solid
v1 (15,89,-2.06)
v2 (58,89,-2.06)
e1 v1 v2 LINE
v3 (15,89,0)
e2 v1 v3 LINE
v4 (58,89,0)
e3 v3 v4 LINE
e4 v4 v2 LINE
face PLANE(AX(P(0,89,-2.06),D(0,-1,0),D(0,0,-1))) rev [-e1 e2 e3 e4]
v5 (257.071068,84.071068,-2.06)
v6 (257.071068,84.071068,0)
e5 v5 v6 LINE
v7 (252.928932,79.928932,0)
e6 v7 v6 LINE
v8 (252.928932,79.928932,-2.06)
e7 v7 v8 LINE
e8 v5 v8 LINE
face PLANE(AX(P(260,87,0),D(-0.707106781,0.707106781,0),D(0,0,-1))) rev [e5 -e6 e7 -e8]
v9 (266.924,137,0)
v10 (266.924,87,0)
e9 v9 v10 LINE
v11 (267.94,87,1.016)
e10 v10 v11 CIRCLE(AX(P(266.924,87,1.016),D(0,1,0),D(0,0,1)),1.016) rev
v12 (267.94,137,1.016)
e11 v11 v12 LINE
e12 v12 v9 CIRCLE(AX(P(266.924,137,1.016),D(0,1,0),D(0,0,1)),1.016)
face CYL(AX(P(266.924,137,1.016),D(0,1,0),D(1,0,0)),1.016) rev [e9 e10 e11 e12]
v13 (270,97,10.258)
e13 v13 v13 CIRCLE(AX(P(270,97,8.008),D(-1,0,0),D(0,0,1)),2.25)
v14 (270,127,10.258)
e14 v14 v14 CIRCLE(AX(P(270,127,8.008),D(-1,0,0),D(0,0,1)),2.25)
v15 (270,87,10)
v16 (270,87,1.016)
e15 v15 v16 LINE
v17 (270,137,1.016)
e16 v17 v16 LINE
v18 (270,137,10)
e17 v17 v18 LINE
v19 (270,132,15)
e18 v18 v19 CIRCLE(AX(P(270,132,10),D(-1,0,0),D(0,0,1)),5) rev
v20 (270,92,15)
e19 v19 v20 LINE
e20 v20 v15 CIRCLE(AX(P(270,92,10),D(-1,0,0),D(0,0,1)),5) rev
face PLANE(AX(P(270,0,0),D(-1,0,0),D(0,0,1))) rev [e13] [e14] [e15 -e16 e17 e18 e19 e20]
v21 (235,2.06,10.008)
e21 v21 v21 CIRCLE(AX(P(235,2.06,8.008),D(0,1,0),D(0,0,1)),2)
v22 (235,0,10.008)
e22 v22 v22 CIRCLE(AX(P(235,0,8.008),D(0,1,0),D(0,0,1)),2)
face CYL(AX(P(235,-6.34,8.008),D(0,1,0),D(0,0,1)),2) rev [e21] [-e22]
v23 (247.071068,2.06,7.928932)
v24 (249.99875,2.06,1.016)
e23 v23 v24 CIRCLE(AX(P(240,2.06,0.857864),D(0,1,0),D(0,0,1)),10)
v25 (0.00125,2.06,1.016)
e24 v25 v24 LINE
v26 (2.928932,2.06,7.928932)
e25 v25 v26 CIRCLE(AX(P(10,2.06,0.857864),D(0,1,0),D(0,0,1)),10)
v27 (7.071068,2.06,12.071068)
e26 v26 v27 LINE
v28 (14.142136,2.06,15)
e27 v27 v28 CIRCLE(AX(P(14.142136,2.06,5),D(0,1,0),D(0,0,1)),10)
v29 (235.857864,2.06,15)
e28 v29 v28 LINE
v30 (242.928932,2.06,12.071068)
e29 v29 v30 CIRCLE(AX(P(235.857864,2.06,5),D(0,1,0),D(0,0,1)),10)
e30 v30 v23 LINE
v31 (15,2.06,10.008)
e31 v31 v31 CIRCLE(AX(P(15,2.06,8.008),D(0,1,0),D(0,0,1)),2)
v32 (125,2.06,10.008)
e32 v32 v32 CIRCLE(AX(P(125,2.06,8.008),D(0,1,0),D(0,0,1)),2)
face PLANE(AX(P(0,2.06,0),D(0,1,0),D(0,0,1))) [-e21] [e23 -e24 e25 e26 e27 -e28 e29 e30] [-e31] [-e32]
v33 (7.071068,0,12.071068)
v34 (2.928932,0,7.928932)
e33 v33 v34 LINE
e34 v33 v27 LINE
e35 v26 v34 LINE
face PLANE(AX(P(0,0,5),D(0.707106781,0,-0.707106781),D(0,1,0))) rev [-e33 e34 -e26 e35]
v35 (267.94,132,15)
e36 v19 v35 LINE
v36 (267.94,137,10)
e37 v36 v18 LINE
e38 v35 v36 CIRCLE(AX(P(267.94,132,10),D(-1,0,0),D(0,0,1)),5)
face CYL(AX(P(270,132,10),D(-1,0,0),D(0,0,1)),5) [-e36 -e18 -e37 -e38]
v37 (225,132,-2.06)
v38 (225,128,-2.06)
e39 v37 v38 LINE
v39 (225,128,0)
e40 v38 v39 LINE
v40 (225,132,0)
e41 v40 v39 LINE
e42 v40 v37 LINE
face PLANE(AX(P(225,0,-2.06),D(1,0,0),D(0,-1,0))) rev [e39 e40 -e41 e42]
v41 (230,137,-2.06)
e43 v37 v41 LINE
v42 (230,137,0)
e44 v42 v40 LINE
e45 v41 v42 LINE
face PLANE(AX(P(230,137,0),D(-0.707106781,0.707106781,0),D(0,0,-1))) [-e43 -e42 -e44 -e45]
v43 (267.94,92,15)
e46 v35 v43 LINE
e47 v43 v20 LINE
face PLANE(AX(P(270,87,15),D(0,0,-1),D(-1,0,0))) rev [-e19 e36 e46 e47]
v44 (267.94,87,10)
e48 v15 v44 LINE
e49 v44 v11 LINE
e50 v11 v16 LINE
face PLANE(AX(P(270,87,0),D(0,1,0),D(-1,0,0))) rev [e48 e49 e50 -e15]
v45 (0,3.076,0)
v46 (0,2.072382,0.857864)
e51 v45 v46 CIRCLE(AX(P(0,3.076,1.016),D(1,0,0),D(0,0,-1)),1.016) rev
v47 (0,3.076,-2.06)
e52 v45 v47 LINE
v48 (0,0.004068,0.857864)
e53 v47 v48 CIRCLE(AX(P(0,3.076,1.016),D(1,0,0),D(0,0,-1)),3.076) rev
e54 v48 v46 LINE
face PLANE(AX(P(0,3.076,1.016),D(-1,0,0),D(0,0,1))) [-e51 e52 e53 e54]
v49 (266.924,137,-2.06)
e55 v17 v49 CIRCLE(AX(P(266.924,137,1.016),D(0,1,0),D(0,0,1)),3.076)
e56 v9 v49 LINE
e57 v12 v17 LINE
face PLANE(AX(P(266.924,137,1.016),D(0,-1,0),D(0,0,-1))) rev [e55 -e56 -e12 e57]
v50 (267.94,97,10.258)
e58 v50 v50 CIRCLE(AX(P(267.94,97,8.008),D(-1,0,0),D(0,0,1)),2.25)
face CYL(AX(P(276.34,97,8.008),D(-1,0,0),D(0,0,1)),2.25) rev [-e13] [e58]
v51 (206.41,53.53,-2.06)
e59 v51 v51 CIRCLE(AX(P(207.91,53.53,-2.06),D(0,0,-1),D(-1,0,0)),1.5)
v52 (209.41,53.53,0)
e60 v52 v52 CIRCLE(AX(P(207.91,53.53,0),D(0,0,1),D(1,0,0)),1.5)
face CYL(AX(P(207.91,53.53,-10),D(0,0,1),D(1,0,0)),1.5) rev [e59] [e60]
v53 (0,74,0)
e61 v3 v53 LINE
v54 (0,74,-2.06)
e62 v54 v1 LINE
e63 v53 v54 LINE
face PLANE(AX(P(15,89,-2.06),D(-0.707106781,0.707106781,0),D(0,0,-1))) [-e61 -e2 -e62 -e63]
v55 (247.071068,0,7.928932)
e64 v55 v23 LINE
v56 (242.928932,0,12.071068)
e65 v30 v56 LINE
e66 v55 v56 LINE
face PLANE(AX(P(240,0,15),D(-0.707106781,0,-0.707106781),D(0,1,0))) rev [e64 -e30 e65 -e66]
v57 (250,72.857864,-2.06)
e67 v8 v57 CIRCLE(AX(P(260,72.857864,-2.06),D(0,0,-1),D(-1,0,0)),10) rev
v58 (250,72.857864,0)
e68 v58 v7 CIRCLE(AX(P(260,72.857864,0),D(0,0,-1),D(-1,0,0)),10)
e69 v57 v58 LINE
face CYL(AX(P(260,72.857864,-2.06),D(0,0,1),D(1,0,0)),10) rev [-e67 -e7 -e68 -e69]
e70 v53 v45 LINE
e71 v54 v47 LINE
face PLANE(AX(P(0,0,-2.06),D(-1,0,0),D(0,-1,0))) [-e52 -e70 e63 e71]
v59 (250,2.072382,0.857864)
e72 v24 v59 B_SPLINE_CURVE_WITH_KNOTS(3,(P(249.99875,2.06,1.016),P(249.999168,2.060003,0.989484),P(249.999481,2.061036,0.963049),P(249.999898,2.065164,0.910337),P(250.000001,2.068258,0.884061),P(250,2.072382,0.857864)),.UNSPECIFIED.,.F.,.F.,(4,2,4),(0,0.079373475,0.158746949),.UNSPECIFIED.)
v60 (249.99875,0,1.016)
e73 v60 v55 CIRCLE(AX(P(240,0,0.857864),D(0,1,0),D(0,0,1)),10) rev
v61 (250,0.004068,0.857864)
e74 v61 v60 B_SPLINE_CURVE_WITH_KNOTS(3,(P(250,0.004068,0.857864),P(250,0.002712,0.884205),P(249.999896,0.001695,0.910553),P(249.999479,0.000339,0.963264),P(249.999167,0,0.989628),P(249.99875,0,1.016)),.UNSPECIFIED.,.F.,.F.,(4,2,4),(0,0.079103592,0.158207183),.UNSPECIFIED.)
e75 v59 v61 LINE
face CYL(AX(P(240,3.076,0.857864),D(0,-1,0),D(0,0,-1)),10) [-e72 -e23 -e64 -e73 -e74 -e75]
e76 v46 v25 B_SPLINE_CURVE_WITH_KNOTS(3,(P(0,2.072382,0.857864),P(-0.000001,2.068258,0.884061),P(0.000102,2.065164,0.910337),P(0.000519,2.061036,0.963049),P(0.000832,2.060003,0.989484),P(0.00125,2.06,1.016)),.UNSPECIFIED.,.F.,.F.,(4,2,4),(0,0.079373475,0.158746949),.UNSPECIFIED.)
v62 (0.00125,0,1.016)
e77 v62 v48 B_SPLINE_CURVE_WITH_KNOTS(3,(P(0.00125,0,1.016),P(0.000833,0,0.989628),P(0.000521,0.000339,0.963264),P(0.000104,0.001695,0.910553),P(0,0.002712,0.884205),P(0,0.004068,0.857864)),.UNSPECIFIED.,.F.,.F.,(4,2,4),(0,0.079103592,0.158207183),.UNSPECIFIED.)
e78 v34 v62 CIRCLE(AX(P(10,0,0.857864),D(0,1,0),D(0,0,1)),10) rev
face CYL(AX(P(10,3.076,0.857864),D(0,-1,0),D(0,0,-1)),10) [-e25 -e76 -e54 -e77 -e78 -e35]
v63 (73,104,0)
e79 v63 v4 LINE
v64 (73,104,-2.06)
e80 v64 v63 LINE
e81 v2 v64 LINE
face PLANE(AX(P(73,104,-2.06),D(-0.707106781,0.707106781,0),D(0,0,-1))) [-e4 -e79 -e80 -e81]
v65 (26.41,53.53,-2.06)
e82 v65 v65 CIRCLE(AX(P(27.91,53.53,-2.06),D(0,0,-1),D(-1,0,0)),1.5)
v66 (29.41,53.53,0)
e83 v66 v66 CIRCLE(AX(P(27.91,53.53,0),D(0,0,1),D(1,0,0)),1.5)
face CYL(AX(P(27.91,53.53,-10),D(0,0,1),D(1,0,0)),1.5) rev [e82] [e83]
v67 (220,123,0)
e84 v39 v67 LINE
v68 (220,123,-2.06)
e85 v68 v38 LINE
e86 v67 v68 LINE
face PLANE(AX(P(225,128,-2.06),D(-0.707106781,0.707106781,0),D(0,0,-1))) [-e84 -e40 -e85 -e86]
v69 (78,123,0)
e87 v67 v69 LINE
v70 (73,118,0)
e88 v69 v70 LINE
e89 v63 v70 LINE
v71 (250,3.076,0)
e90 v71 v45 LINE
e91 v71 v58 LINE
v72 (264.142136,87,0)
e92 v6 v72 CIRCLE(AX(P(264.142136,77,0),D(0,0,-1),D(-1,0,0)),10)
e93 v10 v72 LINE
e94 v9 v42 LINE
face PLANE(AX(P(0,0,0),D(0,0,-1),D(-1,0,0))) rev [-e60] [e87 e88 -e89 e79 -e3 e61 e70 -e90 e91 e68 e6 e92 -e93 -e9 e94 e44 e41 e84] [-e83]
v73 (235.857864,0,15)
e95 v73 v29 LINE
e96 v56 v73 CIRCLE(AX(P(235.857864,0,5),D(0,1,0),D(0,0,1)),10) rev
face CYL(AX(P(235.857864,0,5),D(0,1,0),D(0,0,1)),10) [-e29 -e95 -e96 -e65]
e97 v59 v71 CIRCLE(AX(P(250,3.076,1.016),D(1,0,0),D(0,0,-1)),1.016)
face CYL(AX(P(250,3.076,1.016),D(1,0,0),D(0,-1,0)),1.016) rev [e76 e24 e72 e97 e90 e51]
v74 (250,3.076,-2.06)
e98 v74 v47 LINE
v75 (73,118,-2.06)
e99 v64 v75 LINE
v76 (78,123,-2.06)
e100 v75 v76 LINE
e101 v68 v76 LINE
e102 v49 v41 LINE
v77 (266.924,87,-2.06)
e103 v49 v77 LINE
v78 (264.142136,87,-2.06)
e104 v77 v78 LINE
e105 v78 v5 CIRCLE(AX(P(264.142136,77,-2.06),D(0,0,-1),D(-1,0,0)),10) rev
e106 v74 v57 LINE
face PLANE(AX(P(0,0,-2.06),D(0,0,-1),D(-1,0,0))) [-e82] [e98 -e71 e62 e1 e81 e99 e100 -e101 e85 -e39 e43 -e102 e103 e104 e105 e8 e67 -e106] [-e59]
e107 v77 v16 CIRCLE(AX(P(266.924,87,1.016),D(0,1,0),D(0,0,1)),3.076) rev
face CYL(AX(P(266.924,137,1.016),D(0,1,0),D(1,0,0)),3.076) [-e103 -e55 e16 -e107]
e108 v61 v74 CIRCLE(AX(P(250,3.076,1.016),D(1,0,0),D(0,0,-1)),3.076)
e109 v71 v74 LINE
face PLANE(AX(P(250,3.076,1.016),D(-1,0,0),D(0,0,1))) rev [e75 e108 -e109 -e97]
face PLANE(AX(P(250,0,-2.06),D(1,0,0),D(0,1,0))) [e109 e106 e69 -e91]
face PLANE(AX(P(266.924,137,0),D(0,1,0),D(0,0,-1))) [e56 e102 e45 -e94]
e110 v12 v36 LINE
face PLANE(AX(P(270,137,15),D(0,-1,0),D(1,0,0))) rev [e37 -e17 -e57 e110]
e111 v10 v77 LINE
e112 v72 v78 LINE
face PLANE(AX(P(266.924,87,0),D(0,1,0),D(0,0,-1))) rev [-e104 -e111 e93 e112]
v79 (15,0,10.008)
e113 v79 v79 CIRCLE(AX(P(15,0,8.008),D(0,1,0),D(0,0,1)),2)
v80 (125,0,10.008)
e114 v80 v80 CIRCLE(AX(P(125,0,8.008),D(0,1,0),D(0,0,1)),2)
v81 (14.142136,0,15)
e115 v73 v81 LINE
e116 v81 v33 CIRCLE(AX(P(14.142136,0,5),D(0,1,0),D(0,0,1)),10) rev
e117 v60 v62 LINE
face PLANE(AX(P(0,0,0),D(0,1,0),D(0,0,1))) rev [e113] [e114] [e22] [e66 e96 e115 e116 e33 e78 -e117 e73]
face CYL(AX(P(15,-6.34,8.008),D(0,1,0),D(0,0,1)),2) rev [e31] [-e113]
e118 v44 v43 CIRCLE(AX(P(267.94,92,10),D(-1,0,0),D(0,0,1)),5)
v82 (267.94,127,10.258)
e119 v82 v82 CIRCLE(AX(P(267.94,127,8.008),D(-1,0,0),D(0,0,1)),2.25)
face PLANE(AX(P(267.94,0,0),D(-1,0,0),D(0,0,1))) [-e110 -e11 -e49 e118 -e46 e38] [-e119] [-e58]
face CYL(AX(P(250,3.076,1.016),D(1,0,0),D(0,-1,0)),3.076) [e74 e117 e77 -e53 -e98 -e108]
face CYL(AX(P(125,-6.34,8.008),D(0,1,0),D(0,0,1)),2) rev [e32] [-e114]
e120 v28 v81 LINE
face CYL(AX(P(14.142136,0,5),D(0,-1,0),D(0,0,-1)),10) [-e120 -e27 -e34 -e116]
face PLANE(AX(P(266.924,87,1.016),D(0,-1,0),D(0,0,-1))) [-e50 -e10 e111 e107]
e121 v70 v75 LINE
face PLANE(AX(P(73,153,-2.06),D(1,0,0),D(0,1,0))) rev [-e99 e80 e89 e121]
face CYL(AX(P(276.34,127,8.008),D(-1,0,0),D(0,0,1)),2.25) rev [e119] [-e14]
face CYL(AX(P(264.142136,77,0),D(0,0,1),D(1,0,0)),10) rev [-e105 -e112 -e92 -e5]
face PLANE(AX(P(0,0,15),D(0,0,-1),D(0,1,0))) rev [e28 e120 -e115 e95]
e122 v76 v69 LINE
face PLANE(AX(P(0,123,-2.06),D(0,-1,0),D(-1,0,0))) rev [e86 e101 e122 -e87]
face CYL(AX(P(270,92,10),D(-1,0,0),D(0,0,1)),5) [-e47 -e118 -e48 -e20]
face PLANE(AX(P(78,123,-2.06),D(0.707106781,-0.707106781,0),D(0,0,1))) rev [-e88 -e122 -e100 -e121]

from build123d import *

# Parameters (mm, degrees)
SKETCH1_W                    = 250
SKETCH1_H                    = 153
BASE_FLANGE1_DEPTH           = 2.06
EDGE_FLANGE1_STRIP_W         = 10.272
EDGE_FLANGE1_STRIP_H         = 2.06
EDGE_FLANGE1_STRIP_CUT_DEPTH = 250
EDGE_FLANGE1_DEPTH           = 250
EDGE_FLANGE2_DEPTH           = 50
CHAMFER1_SIZE                = 10
SKETCH13_R                   = 2
CUT_EXTRUDE2_DEPTH           = 8.4
SKETCH14_R                   = 2.25
CUT_EXTRUDE3_DEPTH           = 8.4
SKETCH20_W                   = 73
SKETCH20_H                   = 64
CUT_EXTRUDE9_DEPTH           = 10
FILLET1_R                    = 10
CHAMFER3_SIZE                = 15
CHAMFER4_SIZE                = 15
SKETCH21_R                   = 1.5
CUT_EXTRUDE10_DEPTH          = 10
FILLET2_R                    = 5
CUT_EXTRUDE11_DEPTH          = 10
CHAMFER5_SIZE                = 5


# Sheet-metal steps are written as plain solids
with BuildPart() as part:
    # Sketch1 → Base-Flange1 (new body)
    with BuildSketch(Plane.XY):
        with Locations((125, 76.5)):
            Rectangle(SKETCH1_W, SKETCH1_H)
    extrude(amount=-BASE_FLANGE1_DEPTH)

    # Edge-Flange1 strip (across the edge) → Edge-Flange1 strip cut (cut)
    with BuildSketch(Plane.YZ):
        with Locations((-2.06, -1.03)):
            Rectangle(EDGE_FLANGE1_STRIP_W, EDGE_FLANGE1_STRIP_H)
    extrude(amount=EDGE_FLANGE1_STRIP_CUT_DEPTH, mode=Mode.SUBTRACT)

    # Edge-Flange1 section (across the edge) → Edge-Flange1 (add)
    with BuildSketch(Plane.YZ):
        with BuildLine():
            Line((0, 1.016), (0, 15))
            Line((0, 15), (2.06, 15))
            Line((2.06, 15), (2.06, 1.016))
            ThreePointArc((2.06, 1.016), (2.35757951, 0.29757951), (3.076, 0))
            Line((3.076, 0), (3.076, -2.06))
            ThreePointArc((3.076, -2.06), (0.900939541, -1.159060459), (0, 1.016))
        make_face()
    extrude(amount=EDGE_FLANGE1_DEPTH)

    # Edge-Flange2 section (across the edge) → Edge-Flange2 (add)
    with BuildSketch(Plane(origin=(270, 87, 0), x_dir=(-1, 0, 0), z_dir=(0, 1, 0))):
        with BuildLine():
            Line((0, 1.016), (0, 15))
            Line((0, 15), (2.06, 15))
            Line((2.06, 15), (2.06, 1.016))
            ThreePointArc((2.06, 1.016), (2.35757951, 0.29757951), (3.076, 0))
            Line((3.076, 0), (20, 0))
            Line((20, 0), (20, -2.06))
            Line((20, -2.06), (3.076, -2.06))
            ThreePointArc((3.076, -2.06), (0.900939541, -1.159060459), (0, 1.016))
        make_face()
    extrude(amount=EDGE_FLANGE2_DEPTH)

    # Chamfer1
    chamfer1_edges = [part.edges().sort_by_distance(p)[0] for p in [
        (0, 1.03, 15),
        (250, 1.03, 15),
        (250, 87, -1.03),
        (250, 153, -1.03),
    ]]
    chamfer(chamfer1_edges, length=CHAMFER1_SIZE)

    # Sketch13 → Cut-Extrude2 (cut)
    with BuildSketch(Plane(origin=(0, 2.06, 0), x_dir=(1, 0, 0), z_dir=(0, 1, 0))):
        with Locations(Location((125, -8.008, 0), (0, 0, 270))):
            Circle(SKETCH13_R)
        with Locations(Location((235, -8.008, 0), (0, 0, 270))):
            Circle(SKETCH13_R)
        with Locations(Location((15, -8.008, 0), (0, 0, 270))):
            Circle(SKETCH13_R)
    extrude(amount=-CUT_EXTRUDE2_DEPTH, mode=Mode.SUBTRACT)

    # Sketch14 → Cut-Extrude3 (cut)
    with BuildSketch(Plane.ZY.offset(-267.94)):
        with Locations((8.008, 127)):
            Circle(SKETCH14_R)
        with Locations((8.008, 97)):
            Circle(SKETCH14_R)
    extrude(amount=-CUT_EXTRUDE3_DEPTH, mode=Mode.SUBTRACT)

    # Sketch20 → Cut-Extrude9 (cut)
    with BuildSketch(Plane.XY):
        with Locations((36.5, 121)):
            Rectangle(SKETCH20_W, SKETCH20_H)
    extrude(amount=-CUT_EXTRUDE9_DEPTH, mode=Mode.SUBTRACT)

    # Fillet1
    fillet1_edges = [part.edges().sort_by_distance(p)[0] for p in [
        (250, 1.03, 5),
        (240, 1.03, 15),
        (10, 1.03, 15),
        (0, 1.03, 5),
        (250, 77, -1.03),
        (260, 87, -1.03),
    ]]
    fillet(fillet1_edges, radius=FILLET1_R)

    # Chamfer3
    chamfer3_edges = [part.edges().sort_by_distance(p)[0] for p in [
        (0, 89, -1.03),
    ]]
    chamfer(chamfer3_edges, length=CHAMFER3_SIZE)

    # Chamfer4
    chamfer4_edges = [part.edges().sort_by_distance(p)[0] for p in [
        (73, 89, -1.03),
    ]]
    chamfer(chamfer4_edges, length=CHAMFER4_SIZE)

    # Sketch21 → Cut-Extrude10 (cut)
    with BuildSketch(Plane.XY):
        with Locations((27.91, 53.53)):
            Circle(SKETCH21_R)
        with Locations((207.91, 53.53)):
            Circle(SKETCH21_R)
    extrude(amount=-CUT_EXTRUDE10_DEPTH, mode=Mode.SUBTRACT)

    # Fillet2
    fillet2_edges = [part.edges().sort_by_distance(p)[0] for p in [
        (268.97, 87, 15),
        (268.97, 137, 15),
    ]]
    fillet(fillet2_edges, radius=FILLET2_R)

    # Sketch22 → Cut-Extrude11 (cut)
    with BuildSketch(Plane.XY):
        Polygon((250, 137), (250, 143), (240, 153), (73, 153), (73, 123), (225, 123), (225, 137), align=None)
    extrude(amount=-CUT_EXTRUDE11_DEPTH, mode=Mode.SUBTRACT)

    # Chamfer5
    chamfer5_edges = [part.edges().sort_by_distance(p)[0] for p in [
        (225, 137, -1.03),
        (225, 123, -1.03),
        (73, 123, -1.03),
    ]]
    chamfer(chamfer5_edges, length=CHAMFER5_SIZE)


solid = part.part
